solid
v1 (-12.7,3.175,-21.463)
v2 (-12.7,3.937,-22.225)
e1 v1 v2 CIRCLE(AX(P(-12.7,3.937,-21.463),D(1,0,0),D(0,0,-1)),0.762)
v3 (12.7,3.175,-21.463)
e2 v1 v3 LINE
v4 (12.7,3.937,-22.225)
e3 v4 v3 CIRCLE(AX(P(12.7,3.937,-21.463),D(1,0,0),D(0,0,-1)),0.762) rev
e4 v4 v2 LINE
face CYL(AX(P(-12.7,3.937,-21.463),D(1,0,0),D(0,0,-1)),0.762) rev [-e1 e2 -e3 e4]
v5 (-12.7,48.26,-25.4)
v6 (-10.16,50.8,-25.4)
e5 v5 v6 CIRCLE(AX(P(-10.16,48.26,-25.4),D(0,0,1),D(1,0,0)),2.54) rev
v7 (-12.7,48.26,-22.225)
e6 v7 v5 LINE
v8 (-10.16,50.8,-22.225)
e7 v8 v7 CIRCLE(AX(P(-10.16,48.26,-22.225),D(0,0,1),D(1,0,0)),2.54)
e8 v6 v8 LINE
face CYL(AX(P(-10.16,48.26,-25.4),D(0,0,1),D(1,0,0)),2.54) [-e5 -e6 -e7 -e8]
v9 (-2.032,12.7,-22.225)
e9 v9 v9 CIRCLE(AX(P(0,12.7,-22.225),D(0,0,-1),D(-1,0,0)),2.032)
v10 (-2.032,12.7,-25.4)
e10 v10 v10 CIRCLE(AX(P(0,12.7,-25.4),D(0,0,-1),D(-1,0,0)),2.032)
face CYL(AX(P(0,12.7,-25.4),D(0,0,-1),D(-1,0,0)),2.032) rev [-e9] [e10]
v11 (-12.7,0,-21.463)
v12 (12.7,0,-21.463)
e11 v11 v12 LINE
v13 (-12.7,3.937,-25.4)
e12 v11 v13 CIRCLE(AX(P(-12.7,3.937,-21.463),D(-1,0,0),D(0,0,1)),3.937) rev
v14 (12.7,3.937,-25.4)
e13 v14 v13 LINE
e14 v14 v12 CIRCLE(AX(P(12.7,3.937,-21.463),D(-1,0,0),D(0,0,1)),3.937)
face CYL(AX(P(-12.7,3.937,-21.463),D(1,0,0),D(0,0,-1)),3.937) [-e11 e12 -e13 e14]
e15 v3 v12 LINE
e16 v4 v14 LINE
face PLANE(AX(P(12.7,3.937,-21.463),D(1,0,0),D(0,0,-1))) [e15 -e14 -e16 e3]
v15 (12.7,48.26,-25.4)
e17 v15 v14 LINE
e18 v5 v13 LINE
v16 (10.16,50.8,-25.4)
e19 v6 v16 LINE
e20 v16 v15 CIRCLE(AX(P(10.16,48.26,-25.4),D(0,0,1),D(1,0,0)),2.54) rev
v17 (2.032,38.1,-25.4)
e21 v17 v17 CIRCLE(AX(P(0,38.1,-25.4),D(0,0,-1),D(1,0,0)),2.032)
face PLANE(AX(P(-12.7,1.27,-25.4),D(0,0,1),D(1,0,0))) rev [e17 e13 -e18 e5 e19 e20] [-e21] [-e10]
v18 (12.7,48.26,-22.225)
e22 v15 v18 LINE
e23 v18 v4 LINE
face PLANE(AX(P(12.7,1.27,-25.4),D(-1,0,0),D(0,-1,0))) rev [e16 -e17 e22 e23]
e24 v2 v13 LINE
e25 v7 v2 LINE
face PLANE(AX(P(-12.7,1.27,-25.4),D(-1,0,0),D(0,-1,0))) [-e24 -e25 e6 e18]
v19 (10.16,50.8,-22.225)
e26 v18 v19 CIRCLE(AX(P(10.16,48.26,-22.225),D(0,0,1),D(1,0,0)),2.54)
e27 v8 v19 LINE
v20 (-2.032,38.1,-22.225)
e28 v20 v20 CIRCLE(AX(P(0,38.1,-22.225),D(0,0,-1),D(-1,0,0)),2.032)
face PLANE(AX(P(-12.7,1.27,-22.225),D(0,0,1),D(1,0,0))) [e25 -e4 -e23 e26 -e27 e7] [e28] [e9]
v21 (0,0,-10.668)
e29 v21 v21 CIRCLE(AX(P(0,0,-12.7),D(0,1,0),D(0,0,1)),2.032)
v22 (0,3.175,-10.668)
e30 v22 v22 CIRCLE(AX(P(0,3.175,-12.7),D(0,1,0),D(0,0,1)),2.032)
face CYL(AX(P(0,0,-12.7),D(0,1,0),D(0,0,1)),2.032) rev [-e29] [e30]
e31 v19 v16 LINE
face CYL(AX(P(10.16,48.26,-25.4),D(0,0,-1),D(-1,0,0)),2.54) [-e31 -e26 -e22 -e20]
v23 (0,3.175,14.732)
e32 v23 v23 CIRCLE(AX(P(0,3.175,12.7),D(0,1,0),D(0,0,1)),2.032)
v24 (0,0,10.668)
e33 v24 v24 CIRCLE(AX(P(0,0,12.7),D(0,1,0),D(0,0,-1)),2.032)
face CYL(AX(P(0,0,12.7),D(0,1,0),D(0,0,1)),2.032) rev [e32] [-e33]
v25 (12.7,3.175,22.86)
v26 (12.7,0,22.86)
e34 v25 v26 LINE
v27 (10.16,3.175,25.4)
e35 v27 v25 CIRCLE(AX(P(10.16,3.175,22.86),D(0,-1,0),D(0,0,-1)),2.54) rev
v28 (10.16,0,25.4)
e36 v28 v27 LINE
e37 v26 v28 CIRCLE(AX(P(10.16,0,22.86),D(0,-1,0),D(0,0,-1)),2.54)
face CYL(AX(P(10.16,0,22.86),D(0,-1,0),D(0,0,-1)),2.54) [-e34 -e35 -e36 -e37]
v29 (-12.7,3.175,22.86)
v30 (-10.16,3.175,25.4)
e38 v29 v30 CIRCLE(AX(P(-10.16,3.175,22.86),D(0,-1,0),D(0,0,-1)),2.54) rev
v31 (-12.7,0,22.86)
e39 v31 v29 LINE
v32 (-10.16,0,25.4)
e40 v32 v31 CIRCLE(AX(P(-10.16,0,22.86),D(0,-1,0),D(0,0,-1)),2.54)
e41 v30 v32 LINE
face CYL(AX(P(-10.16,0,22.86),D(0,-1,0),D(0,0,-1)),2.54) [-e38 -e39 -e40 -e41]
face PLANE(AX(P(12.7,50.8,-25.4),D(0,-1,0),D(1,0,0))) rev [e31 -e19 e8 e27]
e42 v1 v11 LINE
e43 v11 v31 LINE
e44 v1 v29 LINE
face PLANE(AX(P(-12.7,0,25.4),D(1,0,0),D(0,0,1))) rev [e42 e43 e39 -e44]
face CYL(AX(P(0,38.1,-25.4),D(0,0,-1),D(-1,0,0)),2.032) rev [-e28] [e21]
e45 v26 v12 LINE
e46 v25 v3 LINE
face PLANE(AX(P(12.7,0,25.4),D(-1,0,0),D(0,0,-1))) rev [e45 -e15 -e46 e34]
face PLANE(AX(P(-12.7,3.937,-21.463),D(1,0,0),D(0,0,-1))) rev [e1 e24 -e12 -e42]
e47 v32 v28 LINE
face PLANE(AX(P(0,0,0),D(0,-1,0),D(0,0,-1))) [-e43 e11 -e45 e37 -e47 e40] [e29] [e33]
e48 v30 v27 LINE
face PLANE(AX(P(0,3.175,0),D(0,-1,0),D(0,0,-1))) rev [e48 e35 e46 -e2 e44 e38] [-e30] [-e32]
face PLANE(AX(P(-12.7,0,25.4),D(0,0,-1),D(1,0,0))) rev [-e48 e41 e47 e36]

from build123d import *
from build123d.topology import SkipClean

# Parameters (mm, degrees)
SKETCH1_W                  = 25.4
SKETCH1_H                  = 50.8
SKETCH1_R                  = 2.032
BOSS_EXTRUDE1_DEPTH        = 1.27
SKETCH2_W                  = 25.4
SKETCH2_H                  = 50.8
SKETCH2_R                  = 2.032
BOSS_EXTRUDE2_DEPTH        = 1.27
CONVERT_SOLID2_START       = -24.13
CONVERT_SOLID2_OUTLINE_W   = 25.4
CONVERT_SOLID2_OUTLINE_H   = 49.53
CONVERT_SOLID2_OUTLINE_R   = 2.032
CONVERT_SOLID2_DEPTH       = 1.905
CONVERT_SOLID2_START_2     = -10.6679999
CONVERT_SOLID2_2_OUTLINE_W = 25.4
CONVERT_SOLID2_2_OUTLINE_H = 1.905
CONVERT_SOLID2_2_DEPTH     = 21.336301023
CONVERT_SOLID2_START_3     = 14.7320001
CONVERT_SOLID2_3_OUTLINE_W = 25.4
CONVERT_SOLID2_3_OUTLINE_H = 1.905
CONVERT_SOLID2_3_DEPTH     = 10.6679999
CONVERT_SOLID2_START_4     = -22.225
CONVERT_SOLID2_4_OUTLINE_W = 25.4
CONVERT_SOLID2_4_OUTLINE_H = 1.905
CONVERT_SOLID2_4_DEPTH     = 7.493301123
CONVERT_SOLID2_START_5     = 1.27
CONVERT_SOLID2_5_DEPTH     = 1.905
CONVERT_SOLID2_6_DEPTH     = 1.905
CONVERT_SOLID2_START_6     = -14
CONVERT_SOLID2_7_DEPTH     = 28
CONVERT_SOLID2_START_7     = -12.7
CONVERT_SOLID2_8_DEPTH     = 25.4
FILLET1_R                  = 2.54


with BuildPart() as part:
    # Sketch1 → Boss-Extrude1 (new body)
    with BuildSketch(Plane(origin=(0, 0, 0), x_dir=(1, 0, 0), z_dir=(0, 1, 0))):
        Rectangle(SKETCH1_W, SKETCH1_H)
        with Locations(Location((0, 12.7, 0), (0, 0, 270))):
            Circle(SKETCH1_R, mode=Mode.SUBTRACT)
        with Locations(Location((0, -12.7, 0), (0, 0, 90))):
            Circle(SKETCH1_R, mode=Mode.SUBTRACT)
    extrude(amount=BOSS_EXTRUDE1_DEPTH)

    # Sketch2 → Boss-Extrude2 (add)
    with BuildSketch(Plane(origin=(0, 0, -25.4), x_dir=(-1, 0, 0), z_dir=(0, 0, -1))):
        with Locations((0, 25.4)):
            Rectangle(SKETCH2_W, SKETCH2_H)
        with Locations((0, 12.7)):
            Circle(SKETCH2_R, mode=Mode.SUBTRACT)
        with Locations(Location((0, 38.1, 0), (0, 0, 180))):
            Circle(SKETCH2_R, mode=Mode.SUBTRACT)
    extrude(amount=-BOSS_EXTRUDE2_DEPTH)

    # Convert-Solid2: read off the stored shape, not the designer's step
    # Convert-Solid2 outline → Convert-Solid2 (add)
    with SkipClean():  # the faces are left unmerged after this step: merging them gives an invalid solid
        with BuildSketch(Plane.XY.offset(CONVERT_SOLID2_START)):
            with Locations((0, 26.035)):
                Rectangle(CONVERT_SOLID2_OUTLINE_W, CONVERT_SOLID2_OUTLINE_H)
            with Locations((0, 12.7)):
                Circle(CONVERT_SOLID2_OUTLINE_R, mode=Mode.SUBTRACT)
            with Locations((0, 38.1)):
                Circle(CONVERT_SOLID2_OUTLINE_R, mode=Mode.SUBTRACT)
        extrude(amount=CONVERT_SOLID2_DEPTH)
    add(part.part.scale(1), mode=Mode.REPLACE)  # the faces are merged on a copy

    # Convert-Solid2 2 outline → Convert-Solid2 2 (add)
    with BuildSketch(Plane.XY.offset(CONVERT_SOLID2_START_2)):
        with Locations((0, 2.2225)):
            Rectangle(CONVERT_SOLID2_2_OUTLINE_W, CONVERT_SOLID2_2_OUTLINE_H)
    extrude(amount=CONVERT_SOLID2_2_DEPTH)

    # Convert-Solid2 3 outline → Convert-Solid2 3 (add)
    with BuildSketch(Plane.XY.offset(CONVERT_SOLID2_START_3)):
        with Locations((0, 2.2225)):
            Rectangle(CONVERT_SOLID2_3_OUTLINE_W, CONVERT_SOLID2_3_OUTLINE_H)
    extrude(amount=CONVERT_SOLID2_3_DEPTH)

    # Convert-Solid2 4 outline → Convert-Solid2 4 (add)
    with BuildSketch(Plane.XY.offset(CONVERT_SOLID2_START_4)):
        with Locations((0, 2.2225)):
            Rectangle(CONVERT_SOLID2_4_OUTLINE_W, CONVERT_SOLID2_4_OUTLINE_H)
    extrude(amount=CONVERT_SOLID2_4_DEPTH)

    # Convert-Solid2 5 outline → Convert-Solid2 5 (cut)
    with BuildSketch(Plane(origin=(0, 0, 0), x_dir=(1, 0, 0), z_dir=(0, 1, 0)).offset(CONVERT_SOLID2_START_5)):
        with BuildLine():
            ThreePointArc((0.034981041, -10.668301123), (0, -10.668), (-0.034981041, -10.668301123))
            Line((-0.034981041, -10.668301123), (0.034981041, -10.668301123))
        make_face()
        with BuildLine():
            ThreePointArc((0.034981041, 14.731698877), (0, 14.732), (-0.034981041, 14.731698877))
            Line((-0.034981041, 14.731698877), (0.034981041, 14.731698877))
        make_face()
    extrude(amount=CONVERT_SOLID2_5_DEPTH, mode=Mode.SUBTRACT)

    # Convert-Solid2 6 outline → Convert-Solid2 6 (add)
    with BuildSketch(Plane(origin=(0, 0, 0), x_dir=(1, 0, 0), z_dir=(0, 1, 0)).offset(CONVERT_SOLID2_START_5)):
        with BuildLine():
            Line((-12.7, -10.668301123), (-12.7, -14.7320001))
            Line((-12.7, -14.7320001), (0, -14.732))
            ThreePointArc((0, -14.732), (-2.031924718, -12.717491168), (-0.034981041, -10.668301123))
            Line((-0.034981041, -10.668301123), (-12.7, -10.668301123))
        make_face()
        with BuildLine():
            ThreePointArc((0.034981041, -10.668301123), (2.031924718, -12.717491168), (0, -14.732))
            Line((0, -14.732), (12.7, -14.7320001))
            Line((12.7, -14.7320001), (12.7, -10.668301123))
            Line((12.7, -10.668301123), (0.034981041, -10.668301123))
        make_face()
        with BuildLine():
            Line((-12.7, 14.731698877), (-12.7, 10.6679999))
            Line((-12.7, 10.6679999), (0, 10.668))
            ThreePointArc((0, 10.668), (-2.031924718, 12.682508832), (-0.034981041, 14.731698877))
            Line((-0.034981041, 14.731698877), (-12.7, 14.731698877))
        make_face()
        with BuildLine():
            ThreePointArc((0.034981041, 14.731698877), (2.031924718, 12.682508832), (0, 10.668))
            Line((0, 10.668), (12.7, 10.6679999))
            Line((12.7, 10.6679999), (12.7, 14.731698877))
            Line((12.7, 14.731698877), (0.034981041, 14.731698877))
        make_face()
    extrude(amount=CONVERT_SOLID2_6_DEPTH)

    # Convert-Solid2 7 outline → Convert-Solid2 7 (cut)
    with SkipClean():  # the faces are left unmerged after this step: merging them gives an invalid solid
        with BuildSketch(Plane.YZ.offset(CONVERT_SOLID2_START_6)):
            with BuildLine():
                ThreePointArc((3.937, -25.4), (1.153120602, -24.246879398), (0, -21.463))
                Line((0, -21.463), (0, -25.4))
                Line((0, -25.4), (3.937, -25.4))
            make_face()
        extrude(amount=CONVERT_SOLID2_7_DEPTH, mode=Mode.SUBTRACT)

    # Convert-Solid2 8 outline → Convert-Solid2 8 (add)
    with SkipClean():  # the faces are left unmerged after this step: merging them gives an invalid solid
        with BuildSketch(Plane.YZ.offset(CONVERT_SOLID2_START_7)):
            with BuildLine():
                ThreePointArc((3.937, -22.225), (3.398184633, -22.001815367), (3.175, -21.463))
                Line((3.175, -21.463), (3.175, -22.225))
                Line((3.175, -22.225), (3.937, -22.225))
            make_face()
        extrude(amount=CONVERT_SOLID2_8_DEPTH)

    # Fillet1
    fillet1_edges = [part.edges().sort_by_distance(p)[0] for p in [
        (-12.7, 1.5875, 25.4),
        (12.7, 1.5875, 25.4),
        (12.7, 50.8, -23.8125),
        (-12.7, 50.8, -23.8125),
    ]]
    fillet(fillet1_edges, radius=FILLET1_R)


solid = part.part
